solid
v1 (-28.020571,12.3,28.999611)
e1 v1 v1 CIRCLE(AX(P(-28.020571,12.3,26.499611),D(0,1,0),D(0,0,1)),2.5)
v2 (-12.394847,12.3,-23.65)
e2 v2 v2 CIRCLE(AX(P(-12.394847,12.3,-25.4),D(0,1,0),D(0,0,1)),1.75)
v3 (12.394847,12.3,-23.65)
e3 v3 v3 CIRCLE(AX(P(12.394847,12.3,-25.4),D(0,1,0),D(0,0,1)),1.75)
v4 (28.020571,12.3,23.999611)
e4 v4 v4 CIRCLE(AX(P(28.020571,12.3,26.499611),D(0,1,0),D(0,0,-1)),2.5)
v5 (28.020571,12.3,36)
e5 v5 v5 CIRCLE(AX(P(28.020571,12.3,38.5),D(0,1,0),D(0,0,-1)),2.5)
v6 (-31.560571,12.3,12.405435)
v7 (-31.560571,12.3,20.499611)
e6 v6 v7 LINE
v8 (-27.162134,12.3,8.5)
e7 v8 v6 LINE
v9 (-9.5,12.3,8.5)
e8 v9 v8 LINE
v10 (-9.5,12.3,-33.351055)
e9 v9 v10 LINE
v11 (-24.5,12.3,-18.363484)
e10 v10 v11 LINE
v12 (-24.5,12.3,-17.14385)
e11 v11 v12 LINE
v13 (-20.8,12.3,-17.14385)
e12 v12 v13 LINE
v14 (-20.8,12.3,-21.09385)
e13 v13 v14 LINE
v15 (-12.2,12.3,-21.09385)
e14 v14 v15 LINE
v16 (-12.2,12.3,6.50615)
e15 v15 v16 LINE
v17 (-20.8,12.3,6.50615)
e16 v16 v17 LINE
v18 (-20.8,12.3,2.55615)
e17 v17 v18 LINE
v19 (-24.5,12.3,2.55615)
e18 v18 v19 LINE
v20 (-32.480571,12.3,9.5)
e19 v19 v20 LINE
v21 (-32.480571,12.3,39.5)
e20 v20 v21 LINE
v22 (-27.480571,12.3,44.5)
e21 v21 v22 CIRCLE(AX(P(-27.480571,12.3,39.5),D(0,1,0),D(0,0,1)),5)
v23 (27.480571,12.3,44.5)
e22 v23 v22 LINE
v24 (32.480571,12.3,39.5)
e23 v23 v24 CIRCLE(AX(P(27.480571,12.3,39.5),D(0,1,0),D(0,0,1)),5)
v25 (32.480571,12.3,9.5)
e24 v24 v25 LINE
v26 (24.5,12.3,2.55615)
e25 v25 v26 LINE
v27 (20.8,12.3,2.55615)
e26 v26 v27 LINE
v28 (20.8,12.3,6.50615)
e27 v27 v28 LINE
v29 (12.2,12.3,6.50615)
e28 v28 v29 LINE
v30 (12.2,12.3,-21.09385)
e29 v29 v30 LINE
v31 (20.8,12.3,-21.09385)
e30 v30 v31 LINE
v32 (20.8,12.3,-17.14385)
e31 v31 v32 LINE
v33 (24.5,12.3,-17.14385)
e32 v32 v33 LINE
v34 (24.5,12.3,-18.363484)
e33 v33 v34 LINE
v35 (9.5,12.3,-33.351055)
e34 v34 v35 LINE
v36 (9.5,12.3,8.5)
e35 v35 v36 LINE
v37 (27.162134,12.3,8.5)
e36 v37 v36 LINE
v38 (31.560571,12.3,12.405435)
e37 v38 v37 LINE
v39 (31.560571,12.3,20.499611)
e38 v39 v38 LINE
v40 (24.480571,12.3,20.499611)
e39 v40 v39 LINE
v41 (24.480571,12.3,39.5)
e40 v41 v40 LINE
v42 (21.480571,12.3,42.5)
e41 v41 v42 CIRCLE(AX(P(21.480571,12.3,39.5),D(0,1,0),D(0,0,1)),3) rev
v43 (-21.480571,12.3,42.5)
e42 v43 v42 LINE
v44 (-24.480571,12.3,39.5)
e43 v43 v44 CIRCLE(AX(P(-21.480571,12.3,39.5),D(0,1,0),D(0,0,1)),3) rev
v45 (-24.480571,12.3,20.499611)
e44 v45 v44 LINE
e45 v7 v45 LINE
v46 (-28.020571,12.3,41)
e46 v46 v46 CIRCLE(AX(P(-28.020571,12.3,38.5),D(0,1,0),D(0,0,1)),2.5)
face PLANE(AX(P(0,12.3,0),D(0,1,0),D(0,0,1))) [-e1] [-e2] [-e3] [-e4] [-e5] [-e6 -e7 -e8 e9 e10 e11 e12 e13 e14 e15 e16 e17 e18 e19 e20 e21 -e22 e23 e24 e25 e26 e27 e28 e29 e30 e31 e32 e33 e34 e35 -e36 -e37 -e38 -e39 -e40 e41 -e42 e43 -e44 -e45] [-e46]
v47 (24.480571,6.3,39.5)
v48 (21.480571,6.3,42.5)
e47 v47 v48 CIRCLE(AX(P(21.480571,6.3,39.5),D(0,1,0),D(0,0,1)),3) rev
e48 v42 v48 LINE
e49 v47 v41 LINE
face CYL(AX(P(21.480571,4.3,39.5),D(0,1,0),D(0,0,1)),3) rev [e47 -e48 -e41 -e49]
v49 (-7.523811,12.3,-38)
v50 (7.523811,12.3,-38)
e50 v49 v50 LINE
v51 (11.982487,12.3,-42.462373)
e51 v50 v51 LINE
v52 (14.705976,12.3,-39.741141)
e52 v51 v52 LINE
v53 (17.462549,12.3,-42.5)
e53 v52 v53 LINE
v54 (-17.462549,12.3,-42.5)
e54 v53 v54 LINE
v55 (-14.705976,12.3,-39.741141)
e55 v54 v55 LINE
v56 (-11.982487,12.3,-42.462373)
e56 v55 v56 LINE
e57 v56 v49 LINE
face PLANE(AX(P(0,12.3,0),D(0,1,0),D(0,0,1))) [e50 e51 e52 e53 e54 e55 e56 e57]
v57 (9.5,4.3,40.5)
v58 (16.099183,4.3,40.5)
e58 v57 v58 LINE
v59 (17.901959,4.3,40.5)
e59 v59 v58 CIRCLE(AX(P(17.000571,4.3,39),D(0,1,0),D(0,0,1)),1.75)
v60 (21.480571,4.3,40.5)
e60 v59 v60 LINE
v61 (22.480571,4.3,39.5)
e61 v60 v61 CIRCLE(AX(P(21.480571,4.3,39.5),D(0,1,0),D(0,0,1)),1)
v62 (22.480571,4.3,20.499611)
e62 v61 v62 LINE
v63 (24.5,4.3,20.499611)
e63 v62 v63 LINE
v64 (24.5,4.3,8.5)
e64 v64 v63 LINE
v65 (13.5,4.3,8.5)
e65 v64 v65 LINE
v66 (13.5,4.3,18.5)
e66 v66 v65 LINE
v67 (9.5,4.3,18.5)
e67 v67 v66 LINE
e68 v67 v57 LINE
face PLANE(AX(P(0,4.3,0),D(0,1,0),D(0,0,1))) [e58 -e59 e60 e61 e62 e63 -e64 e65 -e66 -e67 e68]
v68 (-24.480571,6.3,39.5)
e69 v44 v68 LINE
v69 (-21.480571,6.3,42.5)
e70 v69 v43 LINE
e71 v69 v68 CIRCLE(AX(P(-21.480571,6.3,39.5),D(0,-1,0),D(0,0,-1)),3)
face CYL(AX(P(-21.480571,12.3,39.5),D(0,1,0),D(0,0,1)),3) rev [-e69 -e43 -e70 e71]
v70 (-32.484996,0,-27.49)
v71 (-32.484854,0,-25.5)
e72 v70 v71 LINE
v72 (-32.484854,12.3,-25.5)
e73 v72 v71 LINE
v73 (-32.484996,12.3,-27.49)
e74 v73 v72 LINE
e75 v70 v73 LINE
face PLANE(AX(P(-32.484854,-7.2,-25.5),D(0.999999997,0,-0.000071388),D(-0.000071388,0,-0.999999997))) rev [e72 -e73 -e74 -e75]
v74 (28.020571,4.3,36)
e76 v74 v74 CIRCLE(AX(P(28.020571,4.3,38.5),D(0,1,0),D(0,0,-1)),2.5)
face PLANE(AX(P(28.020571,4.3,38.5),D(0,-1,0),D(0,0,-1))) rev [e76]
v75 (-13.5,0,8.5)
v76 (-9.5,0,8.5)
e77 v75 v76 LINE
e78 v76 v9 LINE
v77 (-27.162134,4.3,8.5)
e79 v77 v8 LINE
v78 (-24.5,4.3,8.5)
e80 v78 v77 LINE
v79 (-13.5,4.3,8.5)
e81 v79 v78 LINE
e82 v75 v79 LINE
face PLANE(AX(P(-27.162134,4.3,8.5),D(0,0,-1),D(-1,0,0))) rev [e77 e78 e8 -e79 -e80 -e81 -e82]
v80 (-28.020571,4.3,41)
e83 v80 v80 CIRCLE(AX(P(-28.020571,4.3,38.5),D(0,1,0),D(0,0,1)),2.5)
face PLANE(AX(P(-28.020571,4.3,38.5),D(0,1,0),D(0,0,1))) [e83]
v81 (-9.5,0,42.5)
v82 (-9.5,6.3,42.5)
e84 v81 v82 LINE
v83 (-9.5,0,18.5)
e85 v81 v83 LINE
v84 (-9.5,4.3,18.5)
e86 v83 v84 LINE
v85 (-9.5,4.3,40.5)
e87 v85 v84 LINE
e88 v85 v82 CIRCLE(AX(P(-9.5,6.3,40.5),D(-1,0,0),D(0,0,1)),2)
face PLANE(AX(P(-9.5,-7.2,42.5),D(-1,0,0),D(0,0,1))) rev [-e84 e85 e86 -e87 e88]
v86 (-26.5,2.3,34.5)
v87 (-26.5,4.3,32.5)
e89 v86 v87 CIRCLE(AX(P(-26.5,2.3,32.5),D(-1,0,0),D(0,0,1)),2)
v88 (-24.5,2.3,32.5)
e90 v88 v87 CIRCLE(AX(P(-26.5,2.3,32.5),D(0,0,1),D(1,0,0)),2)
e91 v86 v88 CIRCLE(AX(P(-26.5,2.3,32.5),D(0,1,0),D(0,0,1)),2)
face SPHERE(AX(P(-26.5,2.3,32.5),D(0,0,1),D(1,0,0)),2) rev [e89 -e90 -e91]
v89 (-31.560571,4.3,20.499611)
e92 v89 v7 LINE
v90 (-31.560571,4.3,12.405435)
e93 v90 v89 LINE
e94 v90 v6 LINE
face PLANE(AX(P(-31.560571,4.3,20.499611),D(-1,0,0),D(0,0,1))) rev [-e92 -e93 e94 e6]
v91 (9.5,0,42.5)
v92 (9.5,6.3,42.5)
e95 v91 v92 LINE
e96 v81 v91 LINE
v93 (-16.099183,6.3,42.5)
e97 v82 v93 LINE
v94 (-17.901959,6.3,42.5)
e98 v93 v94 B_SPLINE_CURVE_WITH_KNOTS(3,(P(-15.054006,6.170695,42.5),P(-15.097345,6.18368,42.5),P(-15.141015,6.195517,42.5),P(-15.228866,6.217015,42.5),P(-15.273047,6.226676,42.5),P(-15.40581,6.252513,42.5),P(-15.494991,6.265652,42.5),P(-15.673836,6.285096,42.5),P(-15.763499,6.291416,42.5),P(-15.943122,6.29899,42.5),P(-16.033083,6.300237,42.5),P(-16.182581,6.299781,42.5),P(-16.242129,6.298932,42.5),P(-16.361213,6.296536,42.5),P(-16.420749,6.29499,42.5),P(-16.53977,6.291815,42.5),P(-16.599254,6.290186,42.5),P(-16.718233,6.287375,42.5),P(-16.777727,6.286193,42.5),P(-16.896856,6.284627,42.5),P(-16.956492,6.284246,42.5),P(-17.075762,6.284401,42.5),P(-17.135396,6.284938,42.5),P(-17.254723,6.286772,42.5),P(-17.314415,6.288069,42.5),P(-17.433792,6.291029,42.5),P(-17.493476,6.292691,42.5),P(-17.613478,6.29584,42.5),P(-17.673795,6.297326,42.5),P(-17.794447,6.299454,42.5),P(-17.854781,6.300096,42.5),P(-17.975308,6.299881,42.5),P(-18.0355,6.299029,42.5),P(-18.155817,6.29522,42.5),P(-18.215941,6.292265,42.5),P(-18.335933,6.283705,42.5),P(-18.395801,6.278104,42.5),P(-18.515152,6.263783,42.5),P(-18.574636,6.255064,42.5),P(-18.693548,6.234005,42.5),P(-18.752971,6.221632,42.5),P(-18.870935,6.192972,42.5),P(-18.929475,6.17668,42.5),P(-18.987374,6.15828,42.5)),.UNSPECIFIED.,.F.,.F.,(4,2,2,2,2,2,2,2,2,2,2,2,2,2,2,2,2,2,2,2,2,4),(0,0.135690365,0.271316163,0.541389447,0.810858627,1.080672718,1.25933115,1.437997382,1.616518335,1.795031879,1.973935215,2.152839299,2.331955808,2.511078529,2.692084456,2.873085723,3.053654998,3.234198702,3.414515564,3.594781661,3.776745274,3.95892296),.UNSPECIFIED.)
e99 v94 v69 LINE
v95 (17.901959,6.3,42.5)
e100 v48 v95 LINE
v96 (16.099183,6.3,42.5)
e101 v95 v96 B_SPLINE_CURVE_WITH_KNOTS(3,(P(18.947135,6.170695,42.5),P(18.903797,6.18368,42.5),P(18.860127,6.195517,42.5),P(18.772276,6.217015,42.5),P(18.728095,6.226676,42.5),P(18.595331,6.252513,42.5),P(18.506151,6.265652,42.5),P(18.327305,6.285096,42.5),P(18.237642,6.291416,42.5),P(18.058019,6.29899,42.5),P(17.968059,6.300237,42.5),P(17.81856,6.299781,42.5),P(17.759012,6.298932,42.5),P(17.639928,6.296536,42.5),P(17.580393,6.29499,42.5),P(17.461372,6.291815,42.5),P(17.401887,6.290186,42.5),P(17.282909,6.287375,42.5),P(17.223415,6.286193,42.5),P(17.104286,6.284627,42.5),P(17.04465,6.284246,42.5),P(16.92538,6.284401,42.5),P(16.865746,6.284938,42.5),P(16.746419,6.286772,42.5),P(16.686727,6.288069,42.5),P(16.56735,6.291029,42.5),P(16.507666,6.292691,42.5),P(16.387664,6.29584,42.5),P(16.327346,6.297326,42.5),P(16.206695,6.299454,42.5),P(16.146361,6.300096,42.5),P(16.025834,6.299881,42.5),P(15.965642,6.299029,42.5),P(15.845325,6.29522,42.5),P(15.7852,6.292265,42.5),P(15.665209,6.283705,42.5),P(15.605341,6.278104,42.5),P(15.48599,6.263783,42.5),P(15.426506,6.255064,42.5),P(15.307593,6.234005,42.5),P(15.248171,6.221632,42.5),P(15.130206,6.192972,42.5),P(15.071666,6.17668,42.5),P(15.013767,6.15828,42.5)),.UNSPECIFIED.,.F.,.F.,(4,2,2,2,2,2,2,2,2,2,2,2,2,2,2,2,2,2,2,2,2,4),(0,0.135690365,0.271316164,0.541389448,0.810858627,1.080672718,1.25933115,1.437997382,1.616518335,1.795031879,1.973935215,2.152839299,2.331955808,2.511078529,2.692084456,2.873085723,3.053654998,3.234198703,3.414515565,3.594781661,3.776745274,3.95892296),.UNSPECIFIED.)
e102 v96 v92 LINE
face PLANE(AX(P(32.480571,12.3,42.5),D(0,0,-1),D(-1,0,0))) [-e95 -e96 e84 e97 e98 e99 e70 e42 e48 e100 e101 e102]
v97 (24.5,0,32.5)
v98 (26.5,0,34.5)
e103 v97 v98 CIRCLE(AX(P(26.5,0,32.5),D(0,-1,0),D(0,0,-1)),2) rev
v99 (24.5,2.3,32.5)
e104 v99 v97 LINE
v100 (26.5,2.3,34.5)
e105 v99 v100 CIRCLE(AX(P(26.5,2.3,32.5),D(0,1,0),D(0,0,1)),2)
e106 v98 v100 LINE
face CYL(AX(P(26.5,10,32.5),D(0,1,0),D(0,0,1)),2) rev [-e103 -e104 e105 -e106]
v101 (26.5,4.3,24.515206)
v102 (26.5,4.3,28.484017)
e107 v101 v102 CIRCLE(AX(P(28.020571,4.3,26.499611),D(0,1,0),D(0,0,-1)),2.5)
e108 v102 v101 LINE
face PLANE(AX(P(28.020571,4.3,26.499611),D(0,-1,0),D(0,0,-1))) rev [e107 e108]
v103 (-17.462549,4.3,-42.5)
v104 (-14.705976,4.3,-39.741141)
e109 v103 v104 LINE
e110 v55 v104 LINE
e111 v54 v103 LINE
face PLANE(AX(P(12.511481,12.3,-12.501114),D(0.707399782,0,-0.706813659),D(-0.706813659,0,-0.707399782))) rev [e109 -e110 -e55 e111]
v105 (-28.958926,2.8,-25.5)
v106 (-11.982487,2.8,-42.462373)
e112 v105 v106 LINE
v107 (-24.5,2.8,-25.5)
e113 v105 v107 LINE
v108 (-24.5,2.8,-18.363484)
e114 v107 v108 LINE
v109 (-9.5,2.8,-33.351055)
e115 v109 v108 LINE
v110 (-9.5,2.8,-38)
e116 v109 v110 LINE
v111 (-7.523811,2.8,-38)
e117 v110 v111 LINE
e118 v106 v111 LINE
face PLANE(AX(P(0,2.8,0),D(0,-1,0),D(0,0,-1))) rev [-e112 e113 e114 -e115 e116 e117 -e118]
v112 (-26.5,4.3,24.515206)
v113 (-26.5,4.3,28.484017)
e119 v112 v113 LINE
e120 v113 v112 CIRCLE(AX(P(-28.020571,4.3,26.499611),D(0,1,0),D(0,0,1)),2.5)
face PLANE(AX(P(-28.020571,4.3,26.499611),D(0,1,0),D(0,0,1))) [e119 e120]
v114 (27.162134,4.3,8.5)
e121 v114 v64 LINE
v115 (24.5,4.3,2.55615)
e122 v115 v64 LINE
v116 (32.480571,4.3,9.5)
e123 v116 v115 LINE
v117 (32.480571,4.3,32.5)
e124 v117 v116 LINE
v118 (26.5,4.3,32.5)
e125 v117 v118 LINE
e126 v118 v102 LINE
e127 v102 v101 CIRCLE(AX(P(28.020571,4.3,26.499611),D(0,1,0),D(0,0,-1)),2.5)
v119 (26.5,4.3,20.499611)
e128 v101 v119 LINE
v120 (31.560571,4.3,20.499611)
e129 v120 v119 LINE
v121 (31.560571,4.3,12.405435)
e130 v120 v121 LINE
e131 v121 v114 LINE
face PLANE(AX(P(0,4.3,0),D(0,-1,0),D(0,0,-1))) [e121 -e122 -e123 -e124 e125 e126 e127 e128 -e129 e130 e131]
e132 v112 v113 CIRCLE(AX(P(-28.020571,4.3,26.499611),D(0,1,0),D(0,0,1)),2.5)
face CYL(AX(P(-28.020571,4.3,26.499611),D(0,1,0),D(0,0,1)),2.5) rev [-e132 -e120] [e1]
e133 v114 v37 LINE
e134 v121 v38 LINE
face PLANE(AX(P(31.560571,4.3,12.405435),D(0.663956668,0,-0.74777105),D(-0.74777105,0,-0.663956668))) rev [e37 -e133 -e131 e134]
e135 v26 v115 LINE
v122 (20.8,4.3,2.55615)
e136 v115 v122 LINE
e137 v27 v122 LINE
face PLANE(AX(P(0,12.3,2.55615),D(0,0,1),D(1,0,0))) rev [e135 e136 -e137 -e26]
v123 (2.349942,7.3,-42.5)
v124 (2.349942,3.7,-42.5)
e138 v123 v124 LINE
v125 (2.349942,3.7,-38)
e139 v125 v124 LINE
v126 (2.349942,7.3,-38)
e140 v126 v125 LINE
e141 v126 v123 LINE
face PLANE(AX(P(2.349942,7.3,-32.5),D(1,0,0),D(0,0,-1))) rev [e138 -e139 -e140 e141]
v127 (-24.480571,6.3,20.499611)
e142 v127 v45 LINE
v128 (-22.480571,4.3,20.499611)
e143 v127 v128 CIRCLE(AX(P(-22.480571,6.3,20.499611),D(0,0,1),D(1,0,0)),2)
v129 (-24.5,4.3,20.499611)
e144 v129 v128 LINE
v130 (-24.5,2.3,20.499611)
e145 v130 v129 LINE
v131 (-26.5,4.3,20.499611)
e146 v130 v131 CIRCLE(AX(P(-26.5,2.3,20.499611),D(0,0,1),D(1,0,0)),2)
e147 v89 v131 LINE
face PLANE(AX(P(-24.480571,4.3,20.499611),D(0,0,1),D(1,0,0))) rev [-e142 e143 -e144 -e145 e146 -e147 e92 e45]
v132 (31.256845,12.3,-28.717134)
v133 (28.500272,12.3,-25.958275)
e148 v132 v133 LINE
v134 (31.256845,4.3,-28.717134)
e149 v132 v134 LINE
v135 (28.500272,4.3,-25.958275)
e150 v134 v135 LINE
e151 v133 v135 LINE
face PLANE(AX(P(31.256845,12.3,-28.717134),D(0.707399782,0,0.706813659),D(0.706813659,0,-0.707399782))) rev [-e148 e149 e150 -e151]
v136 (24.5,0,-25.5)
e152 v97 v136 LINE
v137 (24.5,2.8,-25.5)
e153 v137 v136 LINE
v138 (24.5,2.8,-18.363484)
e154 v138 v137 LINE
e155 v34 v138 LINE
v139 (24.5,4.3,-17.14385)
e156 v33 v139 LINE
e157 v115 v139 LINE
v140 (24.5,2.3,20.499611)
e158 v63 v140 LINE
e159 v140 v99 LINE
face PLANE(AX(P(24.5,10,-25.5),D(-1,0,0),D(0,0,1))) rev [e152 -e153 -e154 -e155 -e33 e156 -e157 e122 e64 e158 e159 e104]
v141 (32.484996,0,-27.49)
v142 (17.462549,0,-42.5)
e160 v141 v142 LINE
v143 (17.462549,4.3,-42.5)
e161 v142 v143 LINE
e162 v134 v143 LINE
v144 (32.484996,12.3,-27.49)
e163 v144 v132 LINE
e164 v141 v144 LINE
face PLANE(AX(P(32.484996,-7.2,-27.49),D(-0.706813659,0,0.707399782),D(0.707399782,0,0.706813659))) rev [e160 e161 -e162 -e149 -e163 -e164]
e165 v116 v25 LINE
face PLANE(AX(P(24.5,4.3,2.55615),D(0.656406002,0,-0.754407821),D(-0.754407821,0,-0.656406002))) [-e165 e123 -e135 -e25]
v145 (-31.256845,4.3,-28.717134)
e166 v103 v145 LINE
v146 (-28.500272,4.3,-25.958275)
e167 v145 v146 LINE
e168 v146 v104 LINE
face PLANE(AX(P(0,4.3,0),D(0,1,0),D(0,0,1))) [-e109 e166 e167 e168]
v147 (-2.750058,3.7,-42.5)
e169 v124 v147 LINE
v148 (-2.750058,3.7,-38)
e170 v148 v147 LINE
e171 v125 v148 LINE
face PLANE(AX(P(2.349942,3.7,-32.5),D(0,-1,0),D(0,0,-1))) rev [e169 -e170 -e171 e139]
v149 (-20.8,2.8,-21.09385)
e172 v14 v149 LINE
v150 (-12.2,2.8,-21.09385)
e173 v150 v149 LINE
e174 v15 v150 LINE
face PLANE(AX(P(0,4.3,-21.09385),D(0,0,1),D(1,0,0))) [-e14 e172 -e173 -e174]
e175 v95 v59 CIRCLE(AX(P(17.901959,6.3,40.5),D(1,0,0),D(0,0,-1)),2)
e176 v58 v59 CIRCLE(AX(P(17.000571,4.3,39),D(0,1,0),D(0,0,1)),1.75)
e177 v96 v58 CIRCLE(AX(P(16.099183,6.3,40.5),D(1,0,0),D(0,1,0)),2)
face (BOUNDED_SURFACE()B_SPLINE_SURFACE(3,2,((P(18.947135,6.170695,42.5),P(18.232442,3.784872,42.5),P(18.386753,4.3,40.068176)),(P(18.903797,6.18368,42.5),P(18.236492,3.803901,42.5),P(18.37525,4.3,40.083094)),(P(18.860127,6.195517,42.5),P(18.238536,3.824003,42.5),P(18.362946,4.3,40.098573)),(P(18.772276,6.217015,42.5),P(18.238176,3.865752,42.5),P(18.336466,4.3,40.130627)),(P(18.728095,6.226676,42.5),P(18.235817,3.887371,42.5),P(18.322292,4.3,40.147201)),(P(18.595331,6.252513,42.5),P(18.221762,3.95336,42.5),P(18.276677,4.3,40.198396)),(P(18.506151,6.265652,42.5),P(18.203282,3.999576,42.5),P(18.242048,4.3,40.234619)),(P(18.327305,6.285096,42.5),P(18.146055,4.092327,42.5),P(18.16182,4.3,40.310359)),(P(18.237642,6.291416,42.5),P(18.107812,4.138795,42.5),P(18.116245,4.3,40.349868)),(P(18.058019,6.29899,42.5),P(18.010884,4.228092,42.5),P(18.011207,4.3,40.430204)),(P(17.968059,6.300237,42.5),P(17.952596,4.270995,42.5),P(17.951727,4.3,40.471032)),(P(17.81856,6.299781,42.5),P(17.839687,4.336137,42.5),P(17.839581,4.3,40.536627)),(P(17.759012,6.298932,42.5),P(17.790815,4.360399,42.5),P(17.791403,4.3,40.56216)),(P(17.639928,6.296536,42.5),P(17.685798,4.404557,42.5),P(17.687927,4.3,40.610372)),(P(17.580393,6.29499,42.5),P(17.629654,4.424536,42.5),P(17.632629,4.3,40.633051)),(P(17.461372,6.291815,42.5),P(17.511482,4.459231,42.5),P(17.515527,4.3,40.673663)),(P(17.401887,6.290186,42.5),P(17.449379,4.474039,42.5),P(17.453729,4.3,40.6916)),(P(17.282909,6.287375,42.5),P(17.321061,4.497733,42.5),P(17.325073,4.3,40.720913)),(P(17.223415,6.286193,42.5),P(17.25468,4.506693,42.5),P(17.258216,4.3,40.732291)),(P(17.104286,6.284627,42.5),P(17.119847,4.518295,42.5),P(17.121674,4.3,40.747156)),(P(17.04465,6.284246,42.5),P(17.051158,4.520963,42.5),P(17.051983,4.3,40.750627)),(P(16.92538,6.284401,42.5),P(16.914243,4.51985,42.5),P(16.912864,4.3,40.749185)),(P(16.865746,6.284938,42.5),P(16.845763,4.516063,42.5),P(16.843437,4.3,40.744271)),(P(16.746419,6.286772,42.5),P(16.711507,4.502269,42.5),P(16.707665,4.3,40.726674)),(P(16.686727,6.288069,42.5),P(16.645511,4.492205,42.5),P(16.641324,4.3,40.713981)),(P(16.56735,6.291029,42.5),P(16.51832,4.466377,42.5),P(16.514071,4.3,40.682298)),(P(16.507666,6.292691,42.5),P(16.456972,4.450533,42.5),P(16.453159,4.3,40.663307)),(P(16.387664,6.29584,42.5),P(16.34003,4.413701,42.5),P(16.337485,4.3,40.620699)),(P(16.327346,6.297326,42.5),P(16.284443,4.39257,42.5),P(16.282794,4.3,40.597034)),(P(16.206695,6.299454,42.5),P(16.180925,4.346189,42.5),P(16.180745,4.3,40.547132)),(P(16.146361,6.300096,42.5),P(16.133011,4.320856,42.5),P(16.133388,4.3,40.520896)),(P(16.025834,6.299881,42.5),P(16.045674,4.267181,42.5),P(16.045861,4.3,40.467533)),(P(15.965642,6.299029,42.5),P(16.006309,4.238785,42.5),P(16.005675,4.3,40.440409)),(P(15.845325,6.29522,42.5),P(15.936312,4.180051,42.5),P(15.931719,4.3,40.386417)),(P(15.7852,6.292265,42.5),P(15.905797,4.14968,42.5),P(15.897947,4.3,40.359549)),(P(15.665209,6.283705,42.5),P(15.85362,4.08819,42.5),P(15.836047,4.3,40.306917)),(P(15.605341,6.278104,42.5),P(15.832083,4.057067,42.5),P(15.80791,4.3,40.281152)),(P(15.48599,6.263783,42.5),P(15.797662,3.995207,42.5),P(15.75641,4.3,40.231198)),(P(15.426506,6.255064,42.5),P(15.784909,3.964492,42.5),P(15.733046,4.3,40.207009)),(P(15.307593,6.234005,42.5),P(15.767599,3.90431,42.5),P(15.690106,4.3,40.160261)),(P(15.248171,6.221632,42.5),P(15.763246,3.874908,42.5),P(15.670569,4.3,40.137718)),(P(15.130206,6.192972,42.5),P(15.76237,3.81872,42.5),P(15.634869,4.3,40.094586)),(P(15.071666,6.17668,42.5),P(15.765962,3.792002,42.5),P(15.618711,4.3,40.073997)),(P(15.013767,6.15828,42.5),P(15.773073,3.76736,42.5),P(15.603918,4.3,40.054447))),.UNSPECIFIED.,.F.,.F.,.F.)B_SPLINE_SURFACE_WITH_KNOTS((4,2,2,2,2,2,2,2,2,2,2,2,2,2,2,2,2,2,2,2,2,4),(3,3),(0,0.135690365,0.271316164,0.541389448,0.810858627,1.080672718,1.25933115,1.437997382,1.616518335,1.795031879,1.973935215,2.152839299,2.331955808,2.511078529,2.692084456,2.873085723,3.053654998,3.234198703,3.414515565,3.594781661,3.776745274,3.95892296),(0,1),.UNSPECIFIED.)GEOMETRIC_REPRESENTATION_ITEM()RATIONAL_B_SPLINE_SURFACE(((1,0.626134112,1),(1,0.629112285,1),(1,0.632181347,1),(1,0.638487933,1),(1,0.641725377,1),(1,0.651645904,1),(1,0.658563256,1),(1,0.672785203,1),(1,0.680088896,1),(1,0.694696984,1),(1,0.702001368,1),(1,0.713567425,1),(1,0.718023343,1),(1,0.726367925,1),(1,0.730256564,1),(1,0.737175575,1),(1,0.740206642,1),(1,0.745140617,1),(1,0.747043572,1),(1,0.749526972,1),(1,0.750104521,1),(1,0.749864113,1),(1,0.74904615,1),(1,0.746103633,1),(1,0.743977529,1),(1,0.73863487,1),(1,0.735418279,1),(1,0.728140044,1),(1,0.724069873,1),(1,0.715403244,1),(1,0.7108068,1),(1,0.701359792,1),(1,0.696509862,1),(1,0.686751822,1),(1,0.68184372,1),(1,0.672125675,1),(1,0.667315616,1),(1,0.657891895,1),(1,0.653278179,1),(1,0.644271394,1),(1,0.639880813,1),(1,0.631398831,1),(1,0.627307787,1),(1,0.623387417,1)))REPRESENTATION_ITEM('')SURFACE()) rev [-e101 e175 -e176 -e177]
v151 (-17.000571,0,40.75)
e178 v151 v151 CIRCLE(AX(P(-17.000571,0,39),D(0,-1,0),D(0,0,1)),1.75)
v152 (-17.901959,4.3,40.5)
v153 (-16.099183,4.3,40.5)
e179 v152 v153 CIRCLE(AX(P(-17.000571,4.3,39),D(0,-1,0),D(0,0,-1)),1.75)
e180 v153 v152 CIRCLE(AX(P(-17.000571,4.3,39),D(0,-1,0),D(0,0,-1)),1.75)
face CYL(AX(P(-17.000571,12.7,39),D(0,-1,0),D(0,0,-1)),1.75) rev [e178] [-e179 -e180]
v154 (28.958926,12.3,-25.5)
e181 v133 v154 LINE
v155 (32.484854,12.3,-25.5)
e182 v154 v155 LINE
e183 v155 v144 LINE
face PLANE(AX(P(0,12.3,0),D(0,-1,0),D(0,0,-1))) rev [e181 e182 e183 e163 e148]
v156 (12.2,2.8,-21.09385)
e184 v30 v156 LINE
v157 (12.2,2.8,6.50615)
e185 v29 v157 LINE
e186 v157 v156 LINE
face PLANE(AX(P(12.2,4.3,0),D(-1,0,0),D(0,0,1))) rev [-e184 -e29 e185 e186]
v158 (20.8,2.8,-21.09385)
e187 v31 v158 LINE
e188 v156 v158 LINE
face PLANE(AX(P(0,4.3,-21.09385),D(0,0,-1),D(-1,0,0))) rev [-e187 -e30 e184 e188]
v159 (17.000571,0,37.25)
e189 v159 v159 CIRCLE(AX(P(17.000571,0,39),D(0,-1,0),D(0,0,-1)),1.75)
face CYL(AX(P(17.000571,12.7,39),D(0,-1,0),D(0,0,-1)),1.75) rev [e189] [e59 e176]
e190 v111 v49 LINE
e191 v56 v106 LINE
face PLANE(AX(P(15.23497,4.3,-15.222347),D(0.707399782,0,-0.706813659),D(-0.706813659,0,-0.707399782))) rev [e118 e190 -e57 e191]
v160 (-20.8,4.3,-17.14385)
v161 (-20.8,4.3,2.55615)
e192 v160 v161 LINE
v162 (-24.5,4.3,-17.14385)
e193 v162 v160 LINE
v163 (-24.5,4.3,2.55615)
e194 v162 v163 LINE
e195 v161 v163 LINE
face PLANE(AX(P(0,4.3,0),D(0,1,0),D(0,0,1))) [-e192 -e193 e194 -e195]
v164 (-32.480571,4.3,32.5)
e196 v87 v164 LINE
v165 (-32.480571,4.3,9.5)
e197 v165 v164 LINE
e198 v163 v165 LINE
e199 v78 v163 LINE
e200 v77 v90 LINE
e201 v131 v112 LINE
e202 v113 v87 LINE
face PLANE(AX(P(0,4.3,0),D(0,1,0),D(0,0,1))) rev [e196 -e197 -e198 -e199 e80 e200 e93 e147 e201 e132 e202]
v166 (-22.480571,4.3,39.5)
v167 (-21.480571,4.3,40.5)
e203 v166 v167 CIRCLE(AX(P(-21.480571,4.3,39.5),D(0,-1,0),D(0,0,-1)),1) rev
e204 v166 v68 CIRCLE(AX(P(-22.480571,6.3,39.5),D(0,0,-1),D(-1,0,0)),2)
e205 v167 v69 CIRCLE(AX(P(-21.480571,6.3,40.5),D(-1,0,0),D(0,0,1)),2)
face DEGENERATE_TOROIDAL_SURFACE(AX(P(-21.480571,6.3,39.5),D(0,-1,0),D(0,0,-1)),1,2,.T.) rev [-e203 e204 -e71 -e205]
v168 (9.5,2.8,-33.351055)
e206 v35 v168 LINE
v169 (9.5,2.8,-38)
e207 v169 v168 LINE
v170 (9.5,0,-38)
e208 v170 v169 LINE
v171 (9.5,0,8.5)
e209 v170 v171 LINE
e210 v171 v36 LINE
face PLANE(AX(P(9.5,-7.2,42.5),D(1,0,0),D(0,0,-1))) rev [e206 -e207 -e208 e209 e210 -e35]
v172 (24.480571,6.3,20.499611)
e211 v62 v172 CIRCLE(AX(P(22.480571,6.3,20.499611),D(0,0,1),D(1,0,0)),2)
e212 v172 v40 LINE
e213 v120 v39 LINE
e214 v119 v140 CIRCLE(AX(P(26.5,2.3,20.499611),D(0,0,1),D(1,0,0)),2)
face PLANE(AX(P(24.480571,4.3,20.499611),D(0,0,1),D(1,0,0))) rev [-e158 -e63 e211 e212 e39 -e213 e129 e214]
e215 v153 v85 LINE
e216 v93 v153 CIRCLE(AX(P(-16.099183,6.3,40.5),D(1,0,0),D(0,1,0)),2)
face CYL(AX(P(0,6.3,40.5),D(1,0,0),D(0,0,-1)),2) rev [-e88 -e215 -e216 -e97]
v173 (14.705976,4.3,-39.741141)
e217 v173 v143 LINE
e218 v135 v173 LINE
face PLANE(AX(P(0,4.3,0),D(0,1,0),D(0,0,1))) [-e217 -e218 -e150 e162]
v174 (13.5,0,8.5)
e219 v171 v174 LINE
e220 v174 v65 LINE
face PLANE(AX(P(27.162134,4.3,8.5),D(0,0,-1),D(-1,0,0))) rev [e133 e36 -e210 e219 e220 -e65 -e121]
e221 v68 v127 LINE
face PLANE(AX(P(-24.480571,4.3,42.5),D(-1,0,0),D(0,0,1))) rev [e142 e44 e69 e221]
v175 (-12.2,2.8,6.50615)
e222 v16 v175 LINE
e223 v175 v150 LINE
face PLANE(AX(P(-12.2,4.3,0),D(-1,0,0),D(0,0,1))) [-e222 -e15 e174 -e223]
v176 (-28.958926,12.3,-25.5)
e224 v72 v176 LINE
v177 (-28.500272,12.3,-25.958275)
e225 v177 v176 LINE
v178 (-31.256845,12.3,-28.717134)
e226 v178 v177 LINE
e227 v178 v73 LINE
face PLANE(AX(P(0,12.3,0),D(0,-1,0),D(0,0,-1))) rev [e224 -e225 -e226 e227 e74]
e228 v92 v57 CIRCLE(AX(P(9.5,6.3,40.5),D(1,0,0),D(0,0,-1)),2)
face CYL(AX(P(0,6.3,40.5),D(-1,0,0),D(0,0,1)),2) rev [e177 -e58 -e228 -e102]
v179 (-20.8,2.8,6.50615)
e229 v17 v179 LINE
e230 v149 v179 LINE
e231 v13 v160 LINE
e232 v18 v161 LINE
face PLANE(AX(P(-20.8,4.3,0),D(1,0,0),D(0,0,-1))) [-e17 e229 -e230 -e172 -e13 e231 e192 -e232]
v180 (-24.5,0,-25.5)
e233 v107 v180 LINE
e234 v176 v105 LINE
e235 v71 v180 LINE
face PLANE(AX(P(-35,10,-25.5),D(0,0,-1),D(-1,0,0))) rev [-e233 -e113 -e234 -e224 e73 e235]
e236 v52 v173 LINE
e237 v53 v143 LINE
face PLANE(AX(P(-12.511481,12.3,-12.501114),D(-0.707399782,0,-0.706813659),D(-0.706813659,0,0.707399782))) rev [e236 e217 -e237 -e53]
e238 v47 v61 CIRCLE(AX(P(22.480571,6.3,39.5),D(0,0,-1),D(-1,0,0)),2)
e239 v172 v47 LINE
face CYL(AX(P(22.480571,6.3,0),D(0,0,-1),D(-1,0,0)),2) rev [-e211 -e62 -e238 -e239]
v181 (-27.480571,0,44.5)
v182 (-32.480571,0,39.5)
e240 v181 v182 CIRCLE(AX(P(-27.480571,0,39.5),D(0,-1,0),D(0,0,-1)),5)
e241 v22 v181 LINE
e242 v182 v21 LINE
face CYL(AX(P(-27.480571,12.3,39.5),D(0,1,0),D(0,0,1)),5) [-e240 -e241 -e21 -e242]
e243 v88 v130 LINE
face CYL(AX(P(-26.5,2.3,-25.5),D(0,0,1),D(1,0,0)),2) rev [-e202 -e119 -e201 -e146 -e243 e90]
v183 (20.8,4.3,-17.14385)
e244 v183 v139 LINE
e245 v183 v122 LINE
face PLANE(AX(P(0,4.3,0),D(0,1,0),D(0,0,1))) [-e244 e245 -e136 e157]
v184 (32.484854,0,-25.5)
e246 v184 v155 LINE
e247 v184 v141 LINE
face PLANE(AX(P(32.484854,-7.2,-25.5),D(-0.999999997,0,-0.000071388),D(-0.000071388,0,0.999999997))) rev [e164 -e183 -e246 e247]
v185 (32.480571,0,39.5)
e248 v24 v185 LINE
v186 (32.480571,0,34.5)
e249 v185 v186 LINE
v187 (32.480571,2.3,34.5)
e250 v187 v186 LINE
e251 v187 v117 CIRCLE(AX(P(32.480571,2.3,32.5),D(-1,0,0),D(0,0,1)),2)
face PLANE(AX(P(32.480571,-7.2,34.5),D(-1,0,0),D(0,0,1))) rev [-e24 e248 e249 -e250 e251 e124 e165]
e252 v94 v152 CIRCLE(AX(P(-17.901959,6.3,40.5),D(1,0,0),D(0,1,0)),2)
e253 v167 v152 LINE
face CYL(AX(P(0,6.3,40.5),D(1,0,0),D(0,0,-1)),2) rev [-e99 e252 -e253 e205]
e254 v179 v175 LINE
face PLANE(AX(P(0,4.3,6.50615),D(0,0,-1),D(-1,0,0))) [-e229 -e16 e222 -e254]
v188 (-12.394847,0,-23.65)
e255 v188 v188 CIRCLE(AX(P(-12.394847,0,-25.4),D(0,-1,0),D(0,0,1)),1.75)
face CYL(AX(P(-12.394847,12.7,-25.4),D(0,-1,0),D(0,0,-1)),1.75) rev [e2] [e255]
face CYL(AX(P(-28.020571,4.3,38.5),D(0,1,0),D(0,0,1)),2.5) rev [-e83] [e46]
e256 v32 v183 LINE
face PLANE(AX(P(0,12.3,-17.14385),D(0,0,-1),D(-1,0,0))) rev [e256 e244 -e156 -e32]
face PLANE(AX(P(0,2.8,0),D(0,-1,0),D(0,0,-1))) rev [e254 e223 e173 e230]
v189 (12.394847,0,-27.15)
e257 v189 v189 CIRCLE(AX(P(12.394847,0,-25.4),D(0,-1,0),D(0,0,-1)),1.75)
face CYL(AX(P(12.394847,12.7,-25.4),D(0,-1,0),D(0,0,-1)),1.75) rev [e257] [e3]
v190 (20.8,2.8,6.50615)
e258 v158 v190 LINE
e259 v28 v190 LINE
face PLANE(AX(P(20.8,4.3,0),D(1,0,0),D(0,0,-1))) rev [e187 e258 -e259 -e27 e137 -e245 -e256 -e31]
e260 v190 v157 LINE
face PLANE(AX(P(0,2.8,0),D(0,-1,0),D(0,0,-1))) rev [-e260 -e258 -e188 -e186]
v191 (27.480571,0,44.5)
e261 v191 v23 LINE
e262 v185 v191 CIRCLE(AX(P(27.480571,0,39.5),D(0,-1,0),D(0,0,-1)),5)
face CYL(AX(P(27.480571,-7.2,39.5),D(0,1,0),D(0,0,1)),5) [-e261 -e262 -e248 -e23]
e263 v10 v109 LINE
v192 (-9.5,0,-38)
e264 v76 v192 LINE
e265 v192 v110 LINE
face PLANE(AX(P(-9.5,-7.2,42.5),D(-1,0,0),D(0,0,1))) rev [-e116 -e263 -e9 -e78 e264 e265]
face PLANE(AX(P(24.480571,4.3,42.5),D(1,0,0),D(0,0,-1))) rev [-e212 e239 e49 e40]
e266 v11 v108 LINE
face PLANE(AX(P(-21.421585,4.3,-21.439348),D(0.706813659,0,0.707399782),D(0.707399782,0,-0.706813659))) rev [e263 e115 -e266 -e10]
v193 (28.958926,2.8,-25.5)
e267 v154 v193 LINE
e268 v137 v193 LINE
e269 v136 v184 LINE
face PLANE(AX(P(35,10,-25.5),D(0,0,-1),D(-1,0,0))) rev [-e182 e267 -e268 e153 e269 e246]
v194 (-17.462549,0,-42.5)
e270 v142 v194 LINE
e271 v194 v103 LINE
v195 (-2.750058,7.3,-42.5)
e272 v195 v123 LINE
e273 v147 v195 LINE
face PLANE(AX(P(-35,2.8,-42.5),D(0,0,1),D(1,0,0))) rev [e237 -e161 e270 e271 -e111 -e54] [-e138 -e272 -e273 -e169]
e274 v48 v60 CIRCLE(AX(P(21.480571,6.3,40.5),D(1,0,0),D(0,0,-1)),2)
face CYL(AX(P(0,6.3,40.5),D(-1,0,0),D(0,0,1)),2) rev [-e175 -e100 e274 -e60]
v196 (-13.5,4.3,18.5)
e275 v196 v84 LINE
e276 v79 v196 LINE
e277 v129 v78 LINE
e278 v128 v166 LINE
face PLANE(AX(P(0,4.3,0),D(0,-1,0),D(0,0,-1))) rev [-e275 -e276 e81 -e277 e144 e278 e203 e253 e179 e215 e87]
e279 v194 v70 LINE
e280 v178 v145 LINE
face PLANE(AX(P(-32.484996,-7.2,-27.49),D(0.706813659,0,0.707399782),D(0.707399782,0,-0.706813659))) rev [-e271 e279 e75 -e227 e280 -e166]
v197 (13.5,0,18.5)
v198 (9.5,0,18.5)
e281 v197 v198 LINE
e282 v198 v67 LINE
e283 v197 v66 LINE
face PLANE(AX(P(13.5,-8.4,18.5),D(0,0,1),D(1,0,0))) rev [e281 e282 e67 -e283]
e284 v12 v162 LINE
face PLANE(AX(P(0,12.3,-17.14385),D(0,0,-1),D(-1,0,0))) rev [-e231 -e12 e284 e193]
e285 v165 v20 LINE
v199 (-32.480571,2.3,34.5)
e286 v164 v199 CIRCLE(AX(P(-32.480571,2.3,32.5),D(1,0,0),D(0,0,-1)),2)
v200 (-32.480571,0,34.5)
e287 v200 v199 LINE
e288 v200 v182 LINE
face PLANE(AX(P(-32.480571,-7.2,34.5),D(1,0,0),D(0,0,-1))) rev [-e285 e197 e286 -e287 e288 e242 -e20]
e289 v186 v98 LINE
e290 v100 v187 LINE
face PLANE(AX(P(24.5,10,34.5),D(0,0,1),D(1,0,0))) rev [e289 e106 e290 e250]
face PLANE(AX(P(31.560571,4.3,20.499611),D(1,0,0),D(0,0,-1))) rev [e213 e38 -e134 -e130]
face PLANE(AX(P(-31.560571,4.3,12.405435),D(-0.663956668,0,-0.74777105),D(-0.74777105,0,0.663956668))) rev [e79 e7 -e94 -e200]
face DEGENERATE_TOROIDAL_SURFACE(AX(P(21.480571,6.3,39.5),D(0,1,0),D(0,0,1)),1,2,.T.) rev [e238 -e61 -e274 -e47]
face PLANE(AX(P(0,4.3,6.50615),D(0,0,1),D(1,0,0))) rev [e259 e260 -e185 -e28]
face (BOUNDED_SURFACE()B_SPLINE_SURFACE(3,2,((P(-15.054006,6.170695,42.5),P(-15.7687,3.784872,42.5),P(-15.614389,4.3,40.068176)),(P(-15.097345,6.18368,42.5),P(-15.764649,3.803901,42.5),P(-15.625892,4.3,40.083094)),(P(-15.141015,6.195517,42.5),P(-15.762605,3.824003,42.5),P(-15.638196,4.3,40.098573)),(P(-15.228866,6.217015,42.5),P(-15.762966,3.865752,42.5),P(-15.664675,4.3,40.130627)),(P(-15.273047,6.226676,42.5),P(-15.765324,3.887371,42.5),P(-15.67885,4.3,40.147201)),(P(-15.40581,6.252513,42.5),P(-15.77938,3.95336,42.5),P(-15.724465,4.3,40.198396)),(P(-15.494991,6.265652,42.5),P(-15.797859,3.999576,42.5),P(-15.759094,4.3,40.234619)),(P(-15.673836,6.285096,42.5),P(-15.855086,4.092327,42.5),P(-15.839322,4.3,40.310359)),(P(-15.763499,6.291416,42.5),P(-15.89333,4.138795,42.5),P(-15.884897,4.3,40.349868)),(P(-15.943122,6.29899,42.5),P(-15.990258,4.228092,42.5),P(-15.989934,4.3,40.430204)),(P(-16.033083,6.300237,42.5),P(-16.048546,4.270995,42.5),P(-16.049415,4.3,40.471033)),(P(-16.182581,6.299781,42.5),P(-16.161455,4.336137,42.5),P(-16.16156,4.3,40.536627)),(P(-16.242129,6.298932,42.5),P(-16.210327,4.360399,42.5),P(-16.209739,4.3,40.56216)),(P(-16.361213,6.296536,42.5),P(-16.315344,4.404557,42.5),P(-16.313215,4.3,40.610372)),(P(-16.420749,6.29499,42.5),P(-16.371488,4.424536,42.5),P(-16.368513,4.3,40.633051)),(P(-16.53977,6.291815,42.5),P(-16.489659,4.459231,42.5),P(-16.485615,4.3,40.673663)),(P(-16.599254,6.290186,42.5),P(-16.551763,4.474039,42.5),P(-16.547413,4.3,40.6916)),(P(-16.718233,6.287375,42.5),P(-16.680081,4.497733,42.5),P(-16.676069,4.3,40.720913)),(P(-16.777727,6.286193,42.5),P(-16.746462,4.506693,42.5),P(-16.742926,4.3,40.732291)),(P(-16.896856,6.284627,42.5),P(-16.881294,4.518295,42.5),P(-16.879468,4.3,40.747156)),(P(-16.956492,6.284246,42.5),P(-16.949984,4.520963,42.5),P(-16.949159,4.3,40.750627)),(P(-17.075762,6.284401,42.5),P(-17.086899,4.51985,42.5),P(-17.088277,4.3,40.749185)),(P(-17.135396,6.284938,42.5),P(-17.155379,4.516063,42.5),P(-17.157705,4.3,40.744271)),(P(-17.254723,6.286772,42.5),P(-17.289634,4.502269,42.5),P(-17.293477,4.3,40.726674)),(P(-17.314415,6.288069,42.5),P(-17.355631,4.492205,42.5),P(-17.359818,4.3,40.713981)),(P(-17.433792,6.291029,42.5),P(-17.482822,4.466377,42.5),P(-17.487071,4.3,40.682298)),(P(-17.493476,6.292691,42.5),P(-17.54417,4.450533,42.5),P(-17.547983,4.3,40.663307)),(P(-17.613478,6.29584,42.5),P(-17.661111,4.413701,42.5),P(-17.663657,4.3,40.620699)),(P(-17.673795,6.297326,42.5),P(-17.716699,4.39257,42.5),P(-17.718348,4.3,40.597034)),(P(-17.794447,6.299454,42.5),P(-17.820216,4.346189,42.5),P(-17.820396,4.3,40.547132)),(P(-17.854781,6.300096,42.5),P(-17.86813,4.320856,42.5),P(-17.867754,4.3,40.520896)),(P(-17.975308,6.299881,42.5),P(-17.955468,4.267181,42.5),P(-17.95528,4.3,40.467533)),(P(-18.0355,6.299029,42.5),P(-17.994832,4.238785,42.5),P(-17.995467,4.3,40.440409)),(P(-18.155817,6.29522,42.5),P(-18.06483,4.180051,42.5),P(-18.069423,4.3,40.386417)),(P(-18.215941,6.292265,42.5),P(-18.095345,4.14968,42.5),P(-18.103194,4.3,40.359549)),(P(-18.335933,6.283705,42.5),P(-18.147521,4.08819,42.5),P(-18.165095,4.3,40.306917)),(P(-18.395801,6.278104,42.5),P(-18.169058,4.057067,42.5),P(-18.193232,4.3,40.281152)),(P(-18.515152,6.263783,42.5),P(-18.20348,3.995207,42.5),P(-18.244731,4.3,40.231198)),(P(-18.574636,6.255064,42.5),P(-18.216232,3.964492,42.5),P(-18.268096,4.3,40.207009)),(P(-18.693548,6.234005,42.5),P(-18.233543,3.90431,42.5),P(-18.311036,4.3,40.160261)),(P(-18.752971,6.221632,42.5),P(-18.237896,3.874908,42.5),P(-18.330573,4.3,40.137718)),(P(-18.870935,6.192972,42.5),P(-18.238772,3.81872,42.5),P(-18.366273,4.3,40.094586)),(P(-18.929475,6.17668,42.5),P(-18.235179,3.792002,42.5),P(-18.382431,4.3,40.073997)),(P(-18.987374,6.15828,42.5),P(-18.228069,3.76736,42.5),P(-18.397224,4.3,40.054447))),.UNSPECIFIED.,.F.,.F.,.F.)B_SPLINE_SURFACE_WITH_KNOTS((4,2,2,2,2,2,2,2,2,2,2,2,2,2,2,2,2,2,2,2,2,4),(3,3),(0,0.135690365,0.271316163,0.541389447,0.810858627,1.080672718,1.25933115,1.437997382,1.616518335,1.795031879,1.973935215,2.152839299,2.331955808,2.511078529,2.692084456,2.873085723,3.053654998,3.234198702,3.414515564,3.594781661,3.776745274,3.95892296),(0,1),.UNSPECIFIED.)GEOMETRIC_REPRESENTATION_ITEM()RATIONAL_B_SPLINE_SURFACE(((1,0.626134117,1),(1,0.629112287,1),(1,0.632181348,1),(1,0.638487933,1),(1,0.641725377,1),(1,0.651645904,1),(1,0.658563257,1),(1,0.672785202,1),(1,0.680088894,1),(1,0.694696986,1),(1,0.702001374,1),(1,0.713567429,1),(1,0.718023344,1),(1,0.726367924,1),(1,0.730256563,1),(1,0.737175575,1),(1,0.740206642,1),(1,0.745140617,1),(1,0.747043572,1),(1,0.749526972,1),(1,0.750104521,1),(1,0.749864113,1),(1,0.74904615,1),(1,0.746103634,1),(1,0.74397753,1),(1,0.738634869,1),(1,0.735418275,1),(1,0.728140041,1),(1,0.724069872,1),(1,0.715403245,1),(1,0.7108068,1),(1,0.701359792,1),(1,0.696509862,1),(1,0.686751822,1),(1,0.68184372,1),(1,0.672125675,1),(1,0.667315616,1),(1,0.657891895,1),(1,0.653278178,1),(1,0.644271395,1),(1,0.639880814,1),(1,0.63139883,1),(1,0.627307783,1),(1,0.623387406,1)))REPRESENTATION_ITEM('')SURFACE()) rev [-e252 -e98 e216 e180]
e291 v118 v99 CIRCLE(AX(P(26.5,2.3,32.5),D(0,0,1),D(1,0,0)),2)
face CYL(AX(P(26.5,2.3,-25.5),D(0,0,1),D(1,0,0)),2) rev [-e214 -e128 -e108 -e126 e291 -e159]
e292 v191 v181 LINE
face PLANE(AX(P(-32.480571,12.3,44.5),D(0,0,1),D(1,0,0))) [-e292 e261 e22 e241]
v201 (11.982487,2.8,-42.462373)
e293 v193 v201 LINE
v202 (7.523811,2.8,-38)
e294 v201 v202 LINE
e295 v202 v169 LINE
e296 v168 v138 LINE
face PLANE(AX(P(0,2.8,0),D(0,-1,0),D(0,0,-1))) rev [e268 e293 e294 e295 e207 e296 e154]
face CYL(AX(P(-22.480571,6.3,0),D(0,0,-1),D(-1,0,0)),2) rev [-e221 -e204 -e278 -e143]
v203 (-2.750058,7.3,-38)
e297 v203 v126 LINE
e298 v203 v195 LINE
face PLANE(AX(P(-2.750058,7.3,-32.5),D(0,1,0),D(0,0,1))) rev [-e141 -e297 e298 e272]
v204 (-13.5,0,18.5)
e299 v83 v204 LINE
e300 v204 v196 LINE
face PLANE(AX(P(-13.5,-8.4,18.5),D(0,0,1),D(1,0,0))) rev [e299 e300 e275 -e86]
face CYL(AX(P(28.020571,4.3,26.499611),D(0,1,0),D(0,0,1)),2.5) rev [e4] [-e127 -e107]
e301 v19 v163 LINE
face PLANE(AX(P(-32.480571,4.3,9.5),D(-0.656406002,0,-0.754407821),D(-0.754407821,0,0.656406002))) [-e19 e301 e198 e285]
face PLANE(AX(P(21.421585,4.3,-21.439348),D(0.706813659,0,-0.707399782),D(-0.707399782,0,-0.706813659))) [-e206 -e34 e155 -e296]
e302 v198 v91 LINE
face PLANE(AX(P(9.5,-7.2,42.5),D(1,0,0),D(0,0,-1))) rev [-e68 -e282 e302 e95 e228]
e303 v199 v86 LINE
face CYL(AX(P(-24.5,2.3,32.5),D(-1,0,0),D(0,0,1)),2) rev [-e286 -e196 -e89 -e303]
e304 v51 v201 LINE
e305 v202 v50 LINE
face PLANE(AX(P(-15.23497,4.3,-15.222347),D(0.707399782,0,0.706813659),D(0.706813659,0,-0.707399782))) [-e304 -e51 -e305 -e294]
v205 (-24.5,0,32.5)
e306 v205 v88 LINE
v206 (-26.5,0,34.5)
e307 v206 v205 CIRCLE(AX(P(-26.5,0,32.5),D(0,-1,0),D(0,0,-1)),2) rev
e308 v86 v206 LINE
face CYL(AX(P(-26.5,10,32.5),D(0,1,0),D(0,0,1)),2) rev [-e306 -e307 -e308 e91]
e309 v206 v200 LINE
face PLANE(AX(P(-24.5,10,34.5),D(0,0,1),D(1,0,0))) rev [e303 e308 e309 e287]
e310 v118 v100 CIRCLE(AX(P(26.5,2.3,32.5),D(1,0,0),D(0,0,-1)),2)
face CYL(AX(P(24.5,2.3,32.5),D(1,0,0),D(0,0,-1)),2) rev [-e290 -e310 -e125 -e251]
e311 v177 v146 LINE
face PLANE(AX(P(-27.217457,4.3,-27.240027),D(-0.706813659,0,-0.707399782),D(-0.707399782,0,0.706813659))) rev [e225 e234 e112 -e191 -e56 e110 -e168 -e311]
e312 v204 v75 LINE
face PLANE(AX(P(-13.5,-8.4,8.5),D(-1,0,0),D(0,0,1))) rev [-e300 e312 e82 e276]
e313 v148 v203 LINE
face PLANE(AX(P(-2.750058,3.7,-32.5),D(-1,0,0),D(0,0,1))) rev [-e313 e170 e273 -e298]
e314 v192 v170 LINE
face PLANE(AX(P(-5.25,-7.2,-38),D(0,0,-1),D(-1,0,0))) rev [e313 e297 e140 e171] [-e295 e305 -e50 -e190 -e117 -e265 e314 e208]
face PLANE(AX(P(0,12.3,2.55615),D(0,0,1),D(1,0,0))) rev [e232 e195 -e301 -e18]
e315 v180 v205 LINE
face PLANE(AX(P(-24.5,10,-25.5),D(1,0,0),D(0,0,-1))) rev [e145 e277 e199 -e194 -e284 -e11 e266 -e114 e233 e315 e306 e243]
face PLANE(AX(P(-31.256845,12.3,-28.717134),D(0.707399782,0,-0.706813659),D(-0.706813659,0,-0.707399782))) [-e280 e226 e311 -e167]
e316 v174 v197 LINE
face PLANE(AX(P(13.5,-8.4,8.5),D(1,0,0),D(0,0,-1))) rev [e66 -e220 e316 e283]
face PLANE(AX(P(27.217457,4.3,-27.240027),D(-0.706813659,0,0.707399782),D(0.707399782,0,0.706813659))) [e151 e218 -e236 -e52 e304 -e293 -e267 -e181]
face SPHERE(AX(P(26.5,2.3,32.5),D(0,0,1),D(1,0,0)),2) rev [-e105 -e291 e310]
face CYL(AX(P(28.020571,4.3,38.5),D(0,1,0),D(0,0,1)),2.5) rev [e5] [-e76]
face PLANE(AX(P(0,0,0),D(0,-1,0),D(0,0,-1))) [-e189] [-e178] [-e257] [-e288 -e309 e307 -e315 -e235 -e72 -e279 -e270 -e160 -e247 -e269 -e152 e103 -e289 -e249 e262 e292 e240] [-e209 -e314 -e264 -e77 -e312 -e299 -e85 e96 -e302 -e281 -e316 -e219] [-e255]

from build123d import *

# Parameters (mm, degrees)
SKETCH1_W               = 70
SKETCH1_H               = 85
BOSS_EXTRUDE1_DEPTH     = 2.8
SKETCH2_W               = 10.5
SKETCH2_H               = 60
CUT_EXTRUDE1_DEPTH      = 10
SKETCH3_W               = 2.519429159
SKETCH3_H               = 8
CUT_EXTRUDE2_DEPTH      = 10
CUT_EXTRUDE3_DEPTH      = 10
BOSS_EXTRUDE2_OUTLINE_W = 8.6
BOSS_EXTRUDE2_OUTLINE_H = 27.6
BOSS_EXTRUDE2_DEPTH     = 1.5
BOSS_EXTRUDE3_DEPTH     = 8
BOSS_EXTRUDE4_DEPTH     = 8
CUT_EXTRUDE5_DEPTH      = 8
SKETCH14_W              = 64.961141682
SKETCH14_H              = 2
BOSS_EXTRUDE5_DEPTH     = 12.3
FILLET1_R               = 5
SKETCH15_W              = 4
SKETCH15_H              = 10
CUT_EXTRUDE8_DEPTH      = 12.7
SKETCH16_R              = 1.75
CUT_EXTRUDE9_DEPTH      = 12.7
FILLET3_R               = 2
FILLET4_R               = 2
FILLET5_R               = 3
FILLET6_R               = 2
SKETCH17_R              = 2.5
CUT_EXTRUDE10_DEPTH     = 8
SKETCH18_W              = 19
SKETCH18_H              = 7
CUT_EXTRUDE11_DEPTH     = 57.451881976
SKETCH19_W              = 5.1
SKETCH19_H              = 3.6
CUT_EXTRUDE12_DEPTH     = 10


# Read off the part's stored shape, not the designer's step: Boss-Extrude2
with BuildPart() as part:
    # Sketch1 → Boss-Extrude1 (new body)
    with BuildSketch(Plane(origin=(0, 0, 0), x_dir=(1, 0, 0), z_dir=(0, 1, 0))):
        Rectangle(SKETCH1_W, SKETCH1_H)
    extrude(amount=BOSS_EXTRUDE1_DEPTH)

    # Sketch2 → Cut-Extrude1 (cut)
    with BuildSketch(Plane(origin=(0, 0, 0), x_dir=(-1, 0, 0), z_dir=(0, -1, 0))):
        with Locations((-29.75, -4.5)):
            Rectangle(SKETCH2_W, SKETCH2_H)
        with Locations((29.75, -4.5)):
            Rectangle(SKETCH2_W, SKETCH2_H)
    extrude(amount=-CUT_EXTRUDE1_DEPTH, mode=Mode.SUBTRACT)

    # Sketch3 → Cut-Extrude2 (cut)
    with BuildSketch(Plane(origin=(0, 2.8, 0), x_dir=(1, 0, 0), z_dir=(0, 1, 0))):
        Polygon((17.462549034, 42.5), (35, 42.5), (35, 25.5), (32.484854108, 25.5), (32.484996169, 27.489999862), align=None)
        with Locations((33.740285421, -38.5)):
            Rectangle(SKETCH3_W, SKETCH3_H)
        with Locations((-33.740285421, -38.5)):
            Rectangle(SKETCH3_W, SKETCH3_H)
        Polygon((-32.484996169, 27.489999862), (-17.462549034, 42.5), (-35, 42.5), (-35, 25.5), (-32.484854108, 25.5), align=None)
    extrude(amount=-CUT_EXTRUDE2_DEPTH, mode=Mode.SUBTRACT)

    # Sketch5 → Cut-Extrude3 (cut)
    with BuildSketch(Plane(origin=(0, 2.8, 0), x_dir=(1, 0, 0), z_dir=(0, 1, 0))):
        Polygon((-9.5, -42.5), (9.5, -42.5), (9.5, 31), (5.25, 31), (5.25, 38), (-5.25, 38), (-5.25, 31), (-9.5, 31), align=None)
    extrude(amount=-CUT_EXTRUDE3_DEPTH, mode=Mode.SUBTRACT)

    # Boss-Extrude2 outline → Boss-Extrude2 (add)
    with BuildSketch(Plane(origin=(0, 2.8, 0), x_dir=(1, 0, 0), z_dir=(0, 1, 0))):
        Polygon((-32.480570841, -42.5), (-9.5, -42.5), (-9.5, 31), (-5.25, 31), (-5.25, 38), (5.25, 38), (5.25, 31), (9.5, 31), (9.5, -42.5), (32.480570841, -42.5), (32.480570841, -34.5), (24.5, -34.5), (24.5, 18.363483562), (6.1866146, 36.661695224), (11.982486603, 42.462373437), (28.958926038, 25.5), (32.484854108, 25.5), (32.484996169, 27.489999862), (17.462549034, 42.5), (-17.462549034, 42.5), (-32.484996169, 27.489999862), (-32.484854108, 25.5), (-28.958926038, 25.5), (-11.982486603, 42.462373437), (-6.1866146, 36.661695224), (-24.5, 18.363483562), (-24.5, -34.5), (-32.480570841, -34.5), align=None)
        with Locations((-16.5, 7.293849796)):
            Rectangle(BOSS_EXTRUDE2_OUTLINE_W, BOSS_EXTRUDE2_OUTLINE_H, mode=Mode.SUBTRACT)
        with Locations((16.5, 7.293849796)):
            Rectangle(BOSS_EXTRUDE2_OUTLINE_W, BOSS_EXTRUDE2_OUTLINE_H, mode=Mode.SUBTRACT)
    extrude(amount=BOSS_EXTRUDE2_DEPTH)

    # Sketch9 → Boss-Extrude3 (add)
    with BuildSketch(Plane(origin=(0, 4.3, 0), x_dir=(1, 0, 0), z_dir=(0, 1, 0))):
        Polygon((-24.5, -34.5), (-32.480570841, -34.5), (-32.480570841, -42.5), (-9.5, -42.5), (-9.5, 31), (-5.25, 31), (-5.25, 38), (0, 38), (5.25, 38), (5.25, 31), (9.5, 31), (9.5, -42.5), (32.480570841, -42.5), (32.480570841, -34.5), (24.5, -34.5), (24.5, -2.556150204), (20.8, -2.556150204), (20.8, -6.506150204), (12.2, -6.506150204), (12.2, 21.093849796), (20.8, 21.093849796), (20.8, 17.143849796), (24.5, 17.143849796), (24.5, 18.363483562), (6.1866146, 36.661695224), (11.982486603, 42.462373437), (14.705975764, 39.74114085), (17.462549034, 42.5), (-17.462549034, 42.5), (-14.705975764, 39.74114085), (-11.982486603, 42.462373437), (-6.1866146, 36.661695224), (-24.5, 18.363483562), (-24.5, 17.143849796), (-20.8, 17.143849796), (-20.8, 21.093849796), (-12.2, 21.093849796), (-12.2, -6.506150204), (-20.8, -6.506150204), (-20.8, -2.556150204), (-24.5, -2.556150204), align=None)
        Polygon((-31.256844783, 28.717133652), (-32.484996169, 27.489999862), (-32.484854108, 25.5), (-28.958926038, 25.5), (-28.500271514, 25.958274502), align=None)
        Polygon((32.484996169, 27.489999862), (31.256844783, 28.717133652), (28.500271514, 25.958274502), (28.958926038, 25.5), (32.484854108, 25.5), align=None)
    extrude(amount=BOSS_EXTRUDE3_DEPTH)

    # Sketch10 → Boss-Extrude4 (add)
    with BuildSketch(Plane(origin=(0, 12.3, 0), x_dir=(1, 0, 0), z_dir=(0, 1, 0))):
        Polygon((-32.480570841, -34.5), (-24.5, -34.5), (-24.5, -2.556150204), (-32.480570841, -9.5), align=None)
        Polygon((32.480570841, -34.5), (24.5, -34.5), (24.5, -9.5), (24.5, -2.556150204), (32.480570841, -9.5), align=None)
    extrude(amount=-BOSS_EXTRUDE4_DEPTH)

    # Sketch11 → Cut-Extrude5 (cut)
    with BuildSketch(Plane(origin=(0, 12.3, 0), x_dir=(1, 0, 0), z_dir=(0, 1, 0))):
        Polygon((-24.480570841, -42.5), (-24.480570841, -20.499611406), (-31.560570841, -20.499611406), (-31.560570841, -12.405434935), (-27.162134436, -8.5), (-9.5, -8.5), (-9.5, -12.405776235), (-9.5, -42.5), align=None)
        Polygon((9.5, -42.5), (24.480570841, -42.5), (24.480570841, -20.499611406), (31.560570841, -20.499611406), (31.560570841, -12.405434935), (27.162134436, -8.5), (9.5, -8.5), (9.5, -12.405776235), align=None)
    extrude(amount=-CUT_EXTRUDE5_DEPTH, mode=Mode.SUBTRACT)

    # Sketch14 → Boss-Extrude5 (add)
    with BuildSketch(Plane(origin=(0, 0, 0), x_dir=(-1, 0, 0), z_dir=(0, -1, 0))):
        with Locations((0, -43.5)):
            Rectangle(SKETCH14_W, SKETCH14_H)
    extrude(amount=-BOSS_EXTRUDE5_DEPTH)

    # Fillet1
    fillet1_edges = [part.edges().sort_by_distance(p)[0] for p in [
        (32.480570841, 6.15, 44.5),
        (-32.480570841, 6.15, 44.5),
    ]]
    fillet(fillet1_edges, radius=FILLET1_R)

    # Sketch15 → Cut-Extrude8 (cut)
    with BuildSketch(Plane(origin=(0, 4.3, 0), x_dir=(1, 0, 0), z_dir=(0, 1, 0))):
        with Locations((-11.5, -13.5)):
            Rectangle(SKETCH15_W, SKETCH15_H)
        with Locations((11.5, -13.5)):
            Rectangle(SKETCH15_W, SKETCH15_H)
    extrude(amount=-CUT_EXTRUDE8_DEPTH, mode=Mode.SUBTRACT)

    # Sketch16 → Cut-Extrude9 (cut)
    with BuildSketch(Plane(origin=(0, 0, 0), x_dir=(-1, 0, 0), z_dir=(0, -1, 0))):
        with Locations(Location((-17.000570841, -39, 0), (0, 0, 90))):
            Circle(SKETCH16_R)
        with Locations(Location((-12.394846918, 25.4, 0), (0, 0, 90))):
            Circle(SKETCH16_R)
        with Locations(Location((12.394846918, 25.4, 0), (0, 0, 270))):
            Circle(SKETCH16_R)
        with Locations(Location((17.000570841, -39, 0), (0, 0, 90))):
            Circle(SKETCH16_R)
    extrude(amount=-CUT_EXTRUDE9_DEPTH, mode=Mode.SUBTRACT)

    # Fillet3
    fillet3_edges = [part.edges().sort_by_distance(p)[0] for p in [
        (-24.5, 4.3, 27.499805703),
        (24.5, 4.3, 27.499805703),
    ]]
    fillet(fillet3_edges, radius=FILLET3_R)

    # Fillet4
    fillet4_edges = [part.edges().sort_by_distance(p)[0] for p in [
        (-29.490285421, 4.3, 34.5),
        (24.5, 1.15, 34.5),
        (29.490285421, 4.3, 34.5),
        (25.085786438, 3.714213562, 34.5),
        (-24.5, 1.15, 34.5),
        (-25.085786438, 3.714213562, 34.5),
    ]]
    fillet(fillet4_edges, radius=FILLET4_R)

    # Fillet5
    fillet5_edges = [part.edges().sort_by_distance(p)[0] for p in [
        (-24.480570841, 8.3, 42.5),
        (24.480570841, 8.3, 42.5),
    ]]
    fillet(fillet5_edges, radius=FILLET5_R)

    # Fillet6
    fillet6_edges = [part.edges().sort_by_distance(p)[0] for p in [
        (-24.480570841, 4.3, 29.999805703),
        (15.490285421, 4.3, 42.5),
        (-15.490285421, 4.3, 42.5),
        (-23.601891185, 4.3, 41.621320344),
        (24.480570841, 4.3, 29.999805703),
        (23.601891185, 4.3, 41.621320344),
    ]]
    fillet(fillet6_edges, radius=FILLET6_R)

    # Sketch17 → Cut-Extrude10 (cut)
    with BuildSketch(Plane(origin=(0, 12.3, 0), x_dir=(1, 0, 0), z_dir=(0, 1, 0))):
        with Locations(Location((-28.020570841, -26.499611406, 0), (0, 0, 270))):
            Circle(SKETCH17_R)
        with Locations(Location((-28.020570841, -38.5, 0), (0, 0, 270))):
            Circle(SKETCH17_R)
        with Locations(Location((28.020570841, -38.5, 0), (0, 0, 90))):
            Circle(SKETCH17_R)
        with Locations(Location((28.020570841, -26.499611406, 0), (0, 0, 232.538489895))):
            Circle(SKETCH17_R)
    extrude(amount=-CUT_EXTRUDE10_DEPTH, mode=Mode.SUBTRACT)

    # Sketch18 → Cut-Extrude11 (cut, through all)
    with BuildSketch(Plane(origin=(0, 12.3, 0), x_dir=(1, 0, 0), z_dir=(0, 1, 0))):
        with Locations((0, 34.5)):
            Rectangle(SKETCH18_W, SKETCH18_H)
    extrude(amount=-CUT_EXTRUDE11_DEPTH, mode=Mode.SUBTRACT)

    # Sketch19 → Cut-Extrude12 (cut)
    with BuildSketch(Plane(origin=(0, 0, -42.5), x_dir=(-1, 0, 0), z_dir=(0, 0, -1))):
        with Locations((0.200058215, 5.5)):
            Rectangle(SKETCH19_W, SKETCH19_H)
    extrude(amount=-CUT_EXTRUDE12_DEPTH, mode=Mode.SUBTRACT)


solid = part.part
